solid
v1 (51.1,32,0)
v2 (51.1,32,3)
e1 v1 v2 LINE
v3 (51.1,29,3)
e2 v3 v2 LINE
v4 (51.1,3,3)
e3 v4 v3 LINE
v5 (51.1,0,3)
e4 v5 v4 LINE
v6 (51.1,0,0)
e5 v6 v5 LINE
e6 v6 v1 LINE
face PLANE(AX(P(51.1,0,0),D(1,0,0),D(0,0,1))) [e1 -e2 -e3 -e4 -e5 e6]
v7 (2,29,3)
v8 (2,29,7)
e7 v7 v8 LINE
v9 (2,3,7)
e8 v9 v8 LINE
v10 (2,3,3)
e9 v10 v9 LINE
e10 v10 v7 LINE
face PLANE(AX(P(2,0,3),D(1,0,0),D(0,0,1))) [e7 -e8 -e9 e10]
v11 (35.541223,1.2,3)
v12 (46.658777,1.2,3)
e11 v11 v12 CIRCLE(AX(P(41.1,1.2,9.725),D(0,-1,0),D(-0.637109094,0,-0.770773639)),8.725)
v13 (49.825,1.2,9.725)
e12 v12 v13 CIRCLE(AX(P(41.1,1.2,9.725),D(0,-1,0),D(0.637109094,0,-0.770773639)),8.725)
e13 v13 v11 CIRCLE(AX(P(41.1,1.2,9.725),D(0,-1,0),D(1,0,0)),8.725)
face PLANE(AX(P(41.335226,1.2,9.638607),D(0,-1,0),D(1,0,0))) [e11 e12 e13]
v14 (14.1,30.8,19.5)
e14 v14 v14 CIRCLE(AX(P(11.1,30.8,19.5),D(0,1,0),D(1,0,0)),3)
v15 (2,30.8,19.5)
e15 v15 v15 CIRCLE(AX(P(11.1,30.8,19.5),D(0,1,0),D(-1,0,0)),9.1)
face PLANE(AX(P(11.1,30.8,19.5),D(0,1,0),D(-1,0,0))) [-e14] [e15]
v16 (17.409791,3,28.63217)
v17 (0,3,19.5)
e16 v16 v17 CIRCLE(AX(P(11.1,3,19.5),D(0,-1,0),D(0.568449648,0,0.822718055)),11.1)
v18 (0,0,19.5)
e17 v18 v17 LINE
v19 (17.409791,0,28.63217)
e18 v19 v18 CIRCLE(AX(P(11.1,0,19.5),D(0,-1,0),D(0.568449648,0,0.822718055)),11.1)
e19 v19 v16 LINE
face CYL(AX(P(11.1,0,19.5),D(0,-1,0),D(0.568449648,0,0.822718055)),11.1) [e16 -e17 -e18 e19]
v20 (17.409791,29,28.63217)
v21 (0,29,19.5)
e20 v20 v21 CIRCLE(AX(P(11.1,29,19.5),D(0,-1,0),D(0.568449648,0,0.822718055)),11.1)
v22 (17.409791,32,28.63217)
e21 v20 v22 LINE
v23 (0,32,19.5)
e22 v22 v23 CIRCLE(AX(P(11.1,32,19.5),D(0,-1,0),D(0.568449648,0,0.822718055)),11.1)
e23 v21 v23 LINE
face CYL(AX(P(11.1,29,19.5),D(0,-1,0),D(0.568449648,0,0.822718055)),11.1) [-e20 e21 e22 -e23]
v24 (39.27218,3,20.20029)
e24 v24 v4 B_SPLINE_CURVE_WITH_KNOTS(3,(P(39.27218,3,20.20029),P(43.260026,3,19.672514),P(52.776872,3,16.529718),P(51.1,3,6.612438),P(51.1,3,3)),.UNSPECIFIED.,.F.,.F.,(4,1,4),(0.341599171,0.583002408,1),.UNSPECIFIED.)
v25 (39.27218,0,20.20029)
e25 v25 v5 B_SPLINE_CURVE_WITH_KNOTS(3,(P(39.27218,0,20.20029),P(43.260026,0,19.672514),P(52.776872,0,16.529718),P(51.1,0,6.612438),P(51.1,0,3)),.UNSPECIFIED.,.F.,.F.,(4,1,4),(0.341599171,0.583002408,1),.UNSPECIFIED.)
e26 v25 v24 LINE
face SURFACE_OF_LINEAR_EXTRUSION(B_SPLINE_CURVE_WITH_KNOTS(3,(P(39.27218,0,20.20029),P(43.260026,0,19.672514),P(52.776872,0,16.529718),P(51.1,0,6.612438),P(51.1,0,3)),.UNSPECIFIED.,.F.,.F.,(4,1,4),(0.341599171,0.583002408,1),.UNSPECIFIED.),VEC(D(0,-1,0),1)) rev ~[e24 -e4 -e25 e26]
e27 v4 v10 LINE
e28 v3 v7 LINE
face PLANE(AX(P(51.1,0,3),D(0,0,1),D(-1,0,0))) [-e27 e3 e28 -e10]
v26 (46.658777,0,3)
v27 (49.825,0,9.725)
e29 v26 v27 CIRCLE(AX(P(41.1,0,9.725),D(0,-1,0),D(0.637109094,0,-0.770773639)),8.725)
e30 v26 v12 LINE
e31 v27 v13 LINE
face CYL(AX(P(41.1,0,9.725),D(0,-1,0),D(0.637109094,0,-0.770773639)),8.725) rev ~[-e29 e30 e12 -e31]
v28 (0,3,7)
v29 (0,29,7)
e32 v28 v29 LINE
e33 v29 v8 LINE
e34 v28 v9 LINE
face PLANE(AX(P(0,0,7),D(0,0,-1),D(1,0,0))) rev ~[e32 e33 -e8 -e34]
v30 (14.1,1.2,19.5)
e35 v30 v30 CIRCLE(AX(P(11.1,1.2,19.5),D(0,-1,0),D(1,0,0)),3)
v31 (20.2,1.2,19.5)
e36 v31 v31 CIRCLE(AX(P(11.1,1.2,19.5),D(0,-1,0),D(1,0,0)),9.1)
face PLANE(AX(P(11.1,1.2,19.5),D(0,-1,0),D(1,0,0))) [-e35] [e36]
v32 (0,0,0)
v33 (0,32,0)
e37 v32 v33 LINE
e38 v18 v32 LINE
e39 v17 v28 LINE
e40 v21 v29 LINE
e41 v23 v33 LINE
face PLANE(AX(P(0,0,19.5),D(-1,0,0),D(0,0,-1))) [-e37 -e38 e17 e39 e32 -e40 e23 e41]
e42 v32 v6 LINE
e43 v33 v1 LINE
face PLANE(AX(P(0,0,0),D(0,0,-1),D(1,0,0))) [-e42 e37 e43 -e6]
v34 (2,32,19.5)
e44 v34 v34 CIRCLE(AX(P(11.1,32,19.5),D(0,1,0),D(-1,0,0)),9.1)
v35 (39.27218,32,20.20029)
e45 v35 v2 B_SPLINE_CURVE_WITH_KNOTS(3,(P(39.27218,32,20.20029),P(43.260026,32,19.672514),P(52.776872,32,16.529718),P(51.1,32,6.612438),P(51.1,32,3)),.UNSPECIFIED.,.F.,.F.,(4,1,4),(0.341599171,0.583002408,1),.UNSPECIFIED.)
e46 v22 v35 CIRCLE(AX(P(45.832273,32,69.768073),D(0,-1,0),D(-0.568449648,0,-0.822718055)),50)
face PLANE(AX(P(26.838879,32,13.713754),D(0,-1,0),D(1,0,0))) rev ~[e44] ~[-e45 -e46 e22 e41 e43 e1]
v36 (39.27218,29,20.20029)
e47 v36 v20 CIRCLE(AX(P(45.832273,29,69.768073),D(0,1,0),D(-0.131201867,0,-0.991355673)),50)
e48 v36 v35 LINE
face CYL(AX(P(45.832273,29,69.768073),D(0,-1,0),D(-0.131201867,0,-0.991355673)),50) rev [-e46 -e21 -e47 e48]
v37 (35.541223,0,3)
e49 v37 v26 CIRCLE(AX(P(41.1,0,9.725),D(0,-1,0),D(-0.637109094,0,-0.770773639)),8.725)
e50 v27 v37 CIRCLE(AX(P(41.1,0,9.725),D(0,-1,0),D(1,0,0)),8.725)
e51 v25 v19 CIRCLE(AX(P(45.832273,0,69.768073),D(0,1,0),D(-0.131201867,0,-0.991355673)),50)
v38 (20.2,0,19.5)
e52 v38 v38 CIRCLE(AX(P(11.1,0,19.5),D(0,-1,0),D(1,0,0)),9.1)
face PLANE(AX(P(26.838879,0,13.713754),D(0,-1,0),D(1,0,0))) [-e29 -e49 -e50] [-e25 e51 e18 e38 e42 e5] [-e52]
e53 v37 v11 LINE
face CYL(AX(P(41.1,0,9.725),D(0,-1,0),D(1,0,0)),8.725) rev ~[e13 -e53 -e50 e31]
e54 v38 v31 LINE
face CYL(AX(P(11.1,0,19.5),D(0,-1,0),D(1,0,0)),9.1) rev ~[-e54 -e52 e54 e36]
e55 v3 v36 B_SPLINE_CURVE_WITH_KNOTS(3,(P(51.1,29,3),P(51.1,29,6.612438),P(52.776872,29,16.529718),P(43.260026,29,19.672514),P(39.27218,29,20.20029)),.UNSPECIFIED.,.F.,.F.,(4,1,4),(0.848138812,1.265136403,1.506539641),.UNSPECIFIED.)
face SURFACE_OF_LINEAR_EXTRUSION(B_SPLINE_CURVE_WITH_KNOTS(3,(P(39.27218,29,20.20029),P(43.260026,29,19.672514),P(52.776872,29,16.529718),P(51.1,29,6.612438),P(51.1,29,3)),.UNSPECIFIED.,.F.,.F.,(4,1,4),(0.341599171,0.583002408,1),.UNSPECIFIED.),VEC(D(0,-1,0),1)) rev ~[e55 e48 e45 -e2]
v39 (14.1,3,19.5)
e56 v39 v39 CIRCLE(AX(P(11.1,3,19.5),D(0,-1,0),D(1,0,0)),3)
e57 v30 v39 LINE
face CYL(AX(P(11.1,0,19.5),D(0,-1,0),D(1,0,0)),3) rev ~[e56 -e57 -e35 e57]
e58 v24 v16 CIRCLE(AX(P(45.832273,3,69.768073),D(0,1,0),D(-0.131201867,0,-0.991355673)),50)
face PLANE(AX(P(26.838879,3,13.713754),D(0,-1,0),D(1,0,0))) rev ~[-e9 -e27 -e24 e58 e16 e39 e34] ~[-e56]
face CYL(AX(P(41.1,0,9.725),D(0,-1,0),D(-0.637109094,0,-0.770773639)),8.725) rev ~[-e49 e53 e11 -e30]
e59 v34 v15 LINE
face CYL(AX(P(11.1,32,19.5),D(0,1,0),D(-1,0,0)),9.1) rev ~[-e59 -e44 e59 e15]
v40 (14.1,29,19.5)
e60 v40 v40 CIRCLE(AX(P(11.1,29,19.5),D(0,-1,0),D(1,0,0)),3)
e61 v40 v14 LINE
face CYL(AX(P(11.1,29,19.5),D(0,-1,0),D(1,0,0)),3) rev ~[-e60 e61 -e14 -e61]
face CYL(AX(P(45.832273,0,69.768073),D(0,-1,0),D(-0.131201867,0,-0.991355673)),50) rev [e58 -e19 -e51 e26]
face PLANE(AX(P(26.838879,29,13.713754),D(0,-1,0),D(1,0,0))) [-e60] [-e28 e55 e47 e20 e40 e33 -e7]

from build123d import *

# Parameters (mm, degrees)
F0_R            = 9.1
F0_W            = 2
F0_H            = 4
F0_R_2          = 3
F1_DEPTH        = 3
F1_COPIES_COUNT = 2
F1_COPIES_PITCH = 29
F2_DEPTH        = 32
F3_R            = 9.1
F4_DEPTH        = 3
F5_DEPTH        = 1.2
F3_R_2          = 3
F6_DEPTH        = 1.2


# Not quite as in the source:
# - a pattern or mirror of a feature is missing from the dataset's text; its kind, count and spacing are read off the source's solid


with BuildPart() as f1:
    # F0 (on Front) → F1 (new body)
    with BuildSketch(Plane.XZ):
        with BuildLine():
            Line((46.6587768439, 3), (51.1, 3))
            add(Edge.make_bspline(
                [(39.2721801194, 20.2002895195), (43.2600263156, 19.672514392), (52.7768717224, 16.5297183629), (51.1, 6.6124380804), (51.1, 3)],
                knots=[0.3415991708, 0.3415991708, 0.3415991708, 0.3415991708, 0.5830024084, 1, 1, 1, 1], degree=3))
            ThreePointArc((39.2721801194, 20.2002895195), (27.8400722418, 23.1174494268), (17.4097910893, 28.6321704107))
            ThreePointArc((17.4097910893, 28.6321704107), (5.9438716604, 29.329768082), (0, 19.5))
            Line((0, 19.5), (0, 7))
            Line((0, 7), (2, 7))
            Line((2, 7), (2, 3))
            Line((2, 3), (35.5412231561, 3))
            ThreePointArc((35.5412231561, 3), (37.3834628323, 17.6188568825), (49.825, 9.725))
            ThreePointArc((49.825, 9.725), (48.9938568825, 6.0084628323), (46.6587768439, 3))
        make_face()
        with Locations((11.1, 19.5)):
            Circle(F0_R, mode=Mode.SUBTRACT)
        with Locations((1, 5)):
            Rectangle(F0_W, F0_H)
        with BuildLine():
            Line((0, 3), (0, 0))
            Line((0, 0), (51.1, 0))
            Line((51.1, 0), (51.1, 3))
            Line((51.1, 3), (46.6587768439, 3))
            ThreePointArc((46.6587768439, 3), (41.1, 1), (35.5412231561, 3))
            Line((35.5412231561, 3), (2, 3))
            Line((2, 3), (0, 3))
        make_face()
        with BuildLine():
            Line((35.5412231561, 3), (46.6587768439, 3))
            ThreePointArc((46.6587768439, 3), (48.9938568825, 6.0084628323), (49.825, 9.725))
            ThreePointArc((49.825, 9.725), (37.3834628323, 17.6188568825), (35.5412231561, 3))
        make_face()
        with BuildLine():
            ThreePointArc((35.5412231561, 3), (41.1, 1), (46.6587768439, 3))
            Line((46.6587768439, 3), (35.5412231561, 3))
        make_face()
        with Locations((11.1, 19.5)):
            Circle(F0_R)
        with Locations((11.1, 19.5)):
            Circle(F0_R_2, mode=Mode.SUBTRACT)
    extrude(amount=-F1_DEPTH)


with BuildPart() as f1_copies_1:
    # F1_copies: instance of F1
    add(f1.part.moved(Location(Vector(0, 1, 0) * (1 * F1_COPIES_PITCH))))


with BuildPart() as f1_1:
    add(f1.part)

    add(f1_copies_1.part)  # F2 merges F1_copies_1
    # F0 (on Front) → F2 (join)
    with BuildSketch(Plane.XZ):
        with BuildLine():
            ThreePointArc((35.5412231561, 3), (41.1, 1), (46.6587768439, 3))
            Line((46.6587768439, 3), (35.5412231561, 3))
        make_face()
        with BuildLine():
            Line((0, 3), (0, 0))
            Line((0, 0), (51.1, 0))
            Line((51.1, 0), (51.1, 3))
            Line((51.1, 3), (46.6587768439, 3))
            ThreePointArc((46.6587768439, 3), (41.1, 1), (35.5412231561, 3))
            Line((35.5412231561, 3), (2, 3))
            Line((2, 3), (0, 3))
        make_face()
        with Locations((1, 5)):
            Rectangle(F0_W, F0_H)
    extrude(amount=-F2_DEPTH)

    # F3 (on face) → F4 (join)
    with BuildSketch(Plane(origin=(0, 32, 0), x_dir=(-1, 0, 0), z_dir=(0, 1, 0))):
        with BuildLine():
            Line((-35.5412231561, 3), (-2, 3))
            Line((-2, 3), (-2, 7))
            Line((-2, 7), (0, 7))
            Line((0, 7), (0, 19.5))
            ThreePointArc((0, 19.5), (-5.9438716604, 29.329768082), (-17.4097910893, 28.6321704107))
            ThreePointArc((-17.4097910893, 28.6321704107), (-24.6422981145, 24.4802718869), (-32.4642883797, 21.5882332434))
            ThreePointArc((-32.4642883797, 21.5882332434), (-35.8440967329, 20.7758663792), (-39.2721801194, 20.2002895195))
            add(Edge.make_bspline(
                [(-39.2721801194, 20.2002895195), (-43.2600263156, 19.672514392), (-50.5817963384, 17.2546092175), (-51.2780387876, 10.8269071453), (-51.2543959351, 7.7483589961)],
                knots=[0.3415991708, 0.3415991708, 0.3415991708, 0.3415991708, 0.5830024084, 0.8481388116, 0.8481388116, 0.8481388116, 0.8481388116], degree=3))
            add(Edge.make_bspline(
                [(-51.1, 3), (-50.9854700291, 4.1577635436), (-50.9621826453, 5.7020696678), (-51.1914335387, 7.3646437275), (-51.2543959351, 7.7483589961)],
                knots=[0, 0, 0, 0, 3.6124380804, 4.6797314617, 4.6797314617, 4.6797314617, 4.6797314617], degree=3))
            Line((-51.1, 3), (-46.6587768439, 3))
            ThreePointArc((-46.6587768439, 3), (-41.1, 18.45), (-35.5412231561, 3))
        make_face()
        with Locations((-11.1, 19.5)):
            Circle(F3_R, mode=Mode.SUBTRACT)
        with BuildLine():
            Line((-46.6587768439, 3), (-35.5412231561, 3))
            ThreePointArc((-35.5412231561, 3), (-41.1, 18.45), (-46.6587768439, 3))
        make_face()
    extrude(amount=-F4_DEPTH)

    # F0 (on Front) → F5 (cut)
    with BuildSketch(Plane.XZ):
        with Locations((11.1, 19.5)):
            Circle(F0_R)
        with Locations((11.1, 19.5)):
            Circle(F0_R_2, mode=Mode.SUBTRACT)
        with BuildLine():
            Line((35.5412231561, 3), (46.6587768439, 3))
            ThreePointArc((46.6587768439, 3), (48.9938568825, 6.0084628323), (49.825, 9.725))
            ThreePointArc((49.825, 9.725), (37.3834628323, 17.6188568825), (35.5412231561, 3))
        make_face()
        with BuildLine():
            ThreePointArc((35.5412231561, 3), (41.1, 1), (46.6587768439, 3))
            Line((46.6587768439, 3), (35.5412231561, 3))
        make_face()
    extrude(amount=-F5_DEPTH, mode=Mode.SUBTRACT)

    # F3 (on face) → F6 (cut)
    with BuildSketch(Plane(origin=(0, 32, 0), x_dir=(-1, 0, 0), z_dir=(0, 1, 0))):
        with Locations((-11.1, 19.5)):
            Circle(F3_R)
        with Locations((-11.1, 19.5)):
            Circle(F3_R_2, mode=Mode.SUBTRACT)
    extrude(amount=-F6_DEPTH, mode=Mode.SUBTRACT)


solid = f1_1.part
